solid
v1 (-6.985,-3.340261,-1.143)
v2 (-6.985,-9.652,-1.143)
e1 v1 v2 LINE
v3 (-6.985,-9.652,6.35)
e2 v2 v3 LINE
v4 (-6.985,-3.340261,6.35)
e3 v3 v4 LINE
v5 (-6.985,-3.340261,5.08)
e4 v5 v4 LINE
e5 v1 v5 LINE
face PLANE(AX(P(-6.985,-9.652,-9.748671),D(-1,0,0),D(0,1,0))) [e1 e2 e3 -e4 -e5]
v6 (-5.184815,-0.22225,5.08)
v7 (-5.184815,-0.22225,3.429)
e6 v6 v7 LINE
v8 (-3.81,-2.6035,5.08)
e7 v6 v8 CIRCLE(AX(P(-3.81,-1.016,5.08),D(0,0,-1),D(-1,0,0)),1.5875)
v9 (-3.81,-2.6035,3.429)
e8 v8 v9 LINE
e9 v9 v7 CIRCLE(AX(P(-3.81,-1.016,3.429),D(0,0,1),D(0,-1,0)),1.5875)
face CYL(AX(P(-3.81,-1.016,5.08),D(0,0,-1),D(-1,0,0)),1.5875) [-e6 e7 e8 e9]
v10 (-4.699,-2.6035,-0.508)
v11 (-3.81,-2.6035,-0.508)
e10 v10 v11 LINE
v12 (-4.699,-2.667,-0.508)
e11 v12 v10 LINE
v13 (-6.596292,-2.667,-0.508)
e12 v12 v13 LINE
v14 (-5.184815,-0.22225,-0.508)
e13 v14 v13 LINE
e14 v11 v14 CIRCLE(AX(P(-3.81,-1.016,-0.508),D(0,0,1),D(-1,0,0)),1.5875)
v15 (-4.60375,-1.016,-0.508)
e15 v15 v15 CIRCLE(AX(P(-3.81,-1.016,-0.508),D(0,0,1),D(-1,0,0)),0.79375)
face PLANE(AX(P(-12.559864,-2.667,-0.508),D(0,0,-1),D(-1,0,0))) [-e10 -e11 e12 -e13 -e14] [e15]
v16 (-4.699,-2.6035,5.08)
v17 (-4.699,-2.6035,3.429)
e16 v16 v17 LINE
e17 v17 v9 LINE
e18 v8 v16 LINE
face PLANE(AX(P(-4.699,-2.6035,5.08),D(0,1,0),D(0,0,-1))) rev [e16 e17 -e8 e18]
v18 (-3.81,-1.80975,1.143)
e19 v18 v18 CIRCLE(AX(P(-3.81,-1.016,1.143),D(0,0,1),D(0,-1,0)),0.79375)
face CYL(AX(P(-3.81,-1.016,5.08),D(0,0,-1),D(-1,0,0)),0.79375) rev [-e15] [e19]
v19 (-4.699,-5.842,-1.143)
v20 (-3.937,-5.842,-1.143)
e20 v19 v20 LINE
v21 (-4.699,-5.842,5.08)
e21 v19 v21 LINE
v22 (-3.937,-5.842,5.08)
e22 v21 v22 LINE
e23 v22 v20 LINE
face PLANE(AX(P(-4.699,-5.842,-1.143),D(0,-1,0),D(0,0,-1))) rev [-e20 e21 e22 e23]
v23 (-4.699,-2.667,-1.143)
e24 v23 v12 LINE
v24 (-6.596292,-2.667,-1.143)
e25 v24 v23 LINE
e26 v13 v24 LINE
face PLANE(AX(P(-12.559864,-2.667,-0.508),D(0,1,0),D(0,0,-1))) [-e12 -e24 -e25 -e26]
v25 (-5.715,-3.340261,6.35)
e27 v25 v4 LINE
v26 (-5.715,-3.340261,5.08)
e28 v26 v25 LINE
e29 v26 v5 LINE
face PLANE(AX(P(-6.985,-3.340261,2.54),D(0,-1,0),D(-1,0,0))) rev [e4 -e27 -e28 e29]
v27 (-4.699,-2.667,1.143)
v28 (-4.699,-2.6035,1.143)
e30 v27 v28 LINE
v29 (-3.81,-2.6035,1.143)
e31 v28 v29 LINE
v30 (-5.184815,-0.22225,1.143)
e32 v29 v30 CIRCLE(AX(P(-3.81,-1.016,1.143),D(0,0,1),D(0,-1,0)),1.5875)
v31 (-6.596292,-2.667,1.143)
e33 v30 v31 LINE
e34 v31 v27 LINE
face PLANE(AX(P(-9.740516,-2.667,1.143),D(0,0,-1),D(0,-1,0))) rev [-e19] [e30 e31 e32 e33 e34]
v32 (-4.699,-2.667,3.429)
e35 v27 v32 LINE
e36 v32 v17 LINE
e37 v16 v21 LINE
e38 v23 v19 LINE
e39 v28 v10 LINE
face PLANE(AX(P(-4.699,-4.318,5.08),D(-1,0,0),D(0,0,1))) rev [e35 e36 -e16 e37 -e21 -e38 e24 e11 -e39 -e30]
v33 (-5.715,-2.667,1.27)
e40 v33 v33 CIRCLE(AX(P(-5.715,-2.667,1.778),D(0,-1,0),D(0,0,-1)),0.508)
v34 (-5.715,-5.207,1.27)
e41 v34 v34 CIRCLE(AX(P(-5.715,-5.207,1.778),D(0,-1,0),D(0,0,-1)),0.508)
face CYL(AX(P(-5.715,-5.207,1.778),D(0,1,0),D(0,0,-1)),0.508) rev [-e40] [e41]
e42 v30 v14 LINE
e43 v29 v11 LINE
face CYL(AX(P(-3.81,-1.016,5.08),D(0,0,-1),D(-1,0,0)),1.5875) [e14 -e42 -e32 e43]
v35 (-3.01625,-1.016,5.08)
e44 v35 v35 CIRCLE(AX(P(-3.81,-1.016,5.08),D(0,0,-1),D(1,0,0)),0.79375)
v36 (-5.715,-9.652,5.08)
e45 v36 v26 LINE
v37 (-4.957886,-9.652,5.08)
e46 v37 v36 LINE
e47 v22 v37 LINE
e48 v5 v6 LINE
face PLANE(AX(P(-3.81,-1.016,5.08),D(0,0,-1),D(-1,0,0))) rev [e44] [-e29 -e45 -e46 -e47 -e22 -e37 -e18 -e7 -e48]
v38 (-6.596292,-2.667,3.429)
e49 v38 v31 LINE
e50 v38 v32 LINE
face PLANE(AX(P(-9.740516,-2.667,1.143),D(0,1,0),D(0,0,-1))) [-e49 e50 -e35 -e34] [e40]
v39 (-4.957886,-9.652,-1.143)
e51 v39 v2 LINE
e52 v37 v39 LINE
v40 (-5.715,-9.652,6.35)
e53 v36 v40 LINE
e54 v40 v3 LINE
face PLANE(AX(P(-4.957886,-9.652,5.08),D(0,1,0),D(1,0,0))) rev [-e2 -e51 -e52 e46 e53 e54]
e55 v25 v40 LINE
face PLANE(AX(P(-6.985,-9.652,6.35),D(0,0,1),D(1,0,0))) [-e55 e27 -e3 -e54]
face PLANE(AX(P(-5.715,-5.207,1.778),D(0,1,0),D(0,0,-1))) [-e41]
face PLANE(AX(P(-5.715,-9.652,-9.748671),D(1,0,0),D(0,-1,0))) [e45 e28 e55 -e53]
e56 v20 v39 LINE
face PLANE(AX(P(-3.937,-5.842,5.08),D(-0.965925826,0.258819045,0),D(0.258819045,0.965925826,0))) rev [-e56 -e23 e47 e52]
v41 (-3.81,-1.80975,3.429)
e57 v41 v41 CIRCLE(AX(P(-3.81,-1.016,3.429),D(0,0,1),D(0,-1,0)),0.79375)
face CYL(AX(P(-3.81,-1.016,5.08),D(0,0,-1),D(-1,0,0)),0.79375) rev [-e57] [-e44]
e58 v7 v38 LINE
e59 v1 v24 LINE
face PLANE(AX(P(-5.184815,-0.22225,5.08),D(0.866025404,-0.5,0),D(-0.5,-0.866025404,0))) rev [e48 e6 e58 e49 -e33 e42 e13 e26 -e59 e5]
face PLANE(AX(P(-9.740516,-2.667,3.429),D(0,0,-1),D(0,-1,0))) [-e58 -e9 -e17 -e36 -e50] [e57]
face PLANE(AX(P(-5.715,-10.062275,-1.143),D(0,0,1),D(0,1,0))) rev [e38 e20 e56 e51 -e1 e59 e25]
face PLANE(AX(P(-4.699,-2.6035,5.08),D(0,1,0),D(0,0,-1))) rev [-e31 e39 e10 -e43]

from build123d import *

# Parameters (mm, degrees)
OUTER_START                              = 2.286
OUTER_CLAMP_LATCH_CUT_EXTRUDE5_DEPTH     = 2.794
OUTER_START_2                            = -1.143
OUTER_CLAMP_LATCH_CUT_EXTRUDE5_2_DEPTH   = 2.4129999
OUTER_START_3                            = -0.508
OUTER_CLAMP_LATCH_CUT_EXTRUDE5_3_OUTLI_R = 0.79375
OUTER_CLAMP_LATCH_CUT_EXTRUDE5_3_DEPTH   = 1.651
OUTER_START_4                            = 3.429
OUTER_CLAMP_LATCH_CUT_EXTRUDE5_4_OUTLI_R = 0.79375
OUTER_CLAMP_LATCH_CUT_EXTRUDE5_4_DEPTH   = 1.651
OUTER_START_5                            = 5.08
OUTER_CLAMP_LATCH_CUT_EXTRUDE5_5_DEPTH   = 1.27
OUTER_START_6                            = 1.2699999
OUTER_CLAMP_LATCH_CUT_EXTRUDE5_6_DEPTH   = 1.0160001
OUTER_START_7                            = -5.207
OUTER_CLAMP_LATCH_CUT_EXTRUDE5_7_OUTLI_R = 0.508
OUTER_CLAMP_LATCH_CUT_EXTRUDE5_7_DEPTH   = 2.54
SKETCH1_W                                = 0.762
SKETCH1_H                                = 1.524
CUT_EXTRUDE1_DEPTH                       = 14.441616644


with BuildPart() as part:
    # <Outer Clamp Latch>-<Cut-Extrude5>: read off the stored shape, not the designer's step
    # <Outer Clamp Latch>-<Cut-Extrude5> outline → <Outer Clamp Latch>-<Cut-Extrude5> (new body)
    with BuildSketch(Plane.XY.offset(OUTER_START)):
        Polygon((-4.699, -4.318), (-4.699, -2.667), (-6.596292399, -2.667), (-6.985, -3.340261314), (-6.985, -9.652), (-4.957886423, -9.652), (-3.937, -5.842), (-3.937, -4.318), align=None)
    extrude(amount=OUTER_CLAMP_LATCH_CUT_EXTRUDE5_DEPTH)

    # Outer Clamp Latch_-_Cut-Extrude5 4 outli → Outer Clamp Latch_-_Cut-Extrude5 4 (add)
    with BuildSketch(Plane.XY.offset(OUTER_START_4)):
        with BuildLine():
            Line((-4.699, -2.667), (-4.699, -2.6035))
            Line((-4.699, -2.6035), (-3.81, -2.6035))
            ThreePointArc((-3.81, -2.6035), (-2.435184671, -0.222249999), (-5.184815329, -0.22225))
            Line((-5.184815329, -0.22225), (-6.596292399, -2.667))
            Line((-6.596292399, -2.667), (-4.699, -2.667))
        make_face()
        with Locations((-3.81, -1.016)):
            Circle(OUTER_CLAMP_LATCH_CUT_EXTRUDE5_4_OUTLI_R, mode=Mode.SUBTRACT)
    extrude(amount=OUTER_CLAMP_LATCH_CUT_EXTRUDE5_4_DEPTH)

    # Outer Clamp Latch_-_Cut-Extrude5 5 outli → Outer Clamp Latch_-_Cut-Extrude5 5 (add)
    with BuildSketch(Plane.XY.offset(OUTER_START_5)):
        Polygon((-5.715, -3.340261314), (-6.985, -3.340261314), (-6.985, -9.652), (-5.715, -9.652), (-5.715, -5.207), align=None)
    extrude(amount=OUTER_CLAMP_LATCH_CUT_EXTRUDE5_5_DEPTH)



with BuildPart() as body_2:
    # Outer Clamp Latch_-_Cut-Extrude5 2 outli → Outer Clamp Latch_-_Cut-Extrude5 2 (new body)
    with BuildSketch(Plane.XY.offset(OUTER_START_2)):
        Polygon((-4.699, -4.318), (-4.699, -2.667), (-6.596292399, -2.667), (-6.985, -3.340261314), (-6.985, -9.652), (-4.957886423, -9.652), (-3.937, -5.842), (-3.937, -4.318), align=None)
    extrude(amount=OUTER_CLAMP_LATCH_CUT_EXTRUDE5_2_DEPTH)

    # Outer Clamp Latch_-_Cut-Extrude5 3 outli → Outer Clamp Latch_-_Cut-Extrude5 3 (add)
    with BuildSketch(Plane.XY.offset(OUTER_START_3)):
        with BuildLine():
            Line((-4.699, -2.667), (-4.699, -2.6035))
            Line((-4.699, -2.6035), (-3.81, -2.6035))
            ThreePointArc((-3.81, -2.6035), (-2.435184671, -0.222249999), (-5.184815329, -0.22225))
            Line((-5.184815329, -0.22225), (-6.596292399, -2.667))
            Line((-6.596292399, -2.667), (-4.699, -2.667))
        make_face()
        with Locations((-3.81, -1.016)):
            Circle(OUTER_CLAMP_LATCH_CUT_EXTRUDE5_3_OUTLI_R, mode=Mode.SUBTRACT)
    extrude(amount=OUTER_CLAMP_LATCH_CUT_EXTRUDE5_3_DEPTH)


with BuildPart() as part_1:
    add(part.part)

    add(body_2.part)  # Outer Clamp Latch_-_Cut-Extrude5 6 merges body 2
    # Outer Clamp Latch_-_Cut-Extrude5 6 outli → Outer Clamp Latch_-_Cut-Extrude5 6 (add)
    with BuildSketch(Plane.XY.offset(OUTER_START_6)):
        Polygon((-4.699, -4.318), (-4.699, -2.667), (-6.596292399, -2.667), (-6.985, -3.340261314), (-6.985, -9.652), (-4.957886423, -9.652), (-3.937, -5.842), (-3.937, -4.318), align=None)
    extrude(amount=OUTER_CLAMP_LATCH_CUT_EXTRUDE5_6_DEPTH)

    # Outer Clamp Latch_-_Cut-Extrude5 7 outli → Outer Clamp Latch_-_Cut-Extrude5 7 (cut)
    with BuildSketch(Plane(origin=(0, 0, 0), x_dir=(1, 0, 0), z_dir=(0, 1, 0)).offset(OUTER_START_7)):
        with Locations((-5.715, -1.778)):
            Circle(OUTER_CLAMP_LATCH_CUT_EXTRUDE5_7_OUTLI_R)
    extrude(amount=OUTER_CLAMP_LATCH_CUT_EXTRUDE5_7_DEPTH, mode=Mode.SUBTRACT)

    # Sketch1 → Cut-Extrude1 (cut, through all)
    with BuildSketch(Plane.XY.offset(5.08)):
        with Locations((-4.318, -5.08)):
            Rectangle(SKETCH1_W, SKETCH1_H)
    extrude(amount=-CUT_EXTRUDE1_DEPTH, mode=Mode.SUBTRACT)


solid = part_1.part
